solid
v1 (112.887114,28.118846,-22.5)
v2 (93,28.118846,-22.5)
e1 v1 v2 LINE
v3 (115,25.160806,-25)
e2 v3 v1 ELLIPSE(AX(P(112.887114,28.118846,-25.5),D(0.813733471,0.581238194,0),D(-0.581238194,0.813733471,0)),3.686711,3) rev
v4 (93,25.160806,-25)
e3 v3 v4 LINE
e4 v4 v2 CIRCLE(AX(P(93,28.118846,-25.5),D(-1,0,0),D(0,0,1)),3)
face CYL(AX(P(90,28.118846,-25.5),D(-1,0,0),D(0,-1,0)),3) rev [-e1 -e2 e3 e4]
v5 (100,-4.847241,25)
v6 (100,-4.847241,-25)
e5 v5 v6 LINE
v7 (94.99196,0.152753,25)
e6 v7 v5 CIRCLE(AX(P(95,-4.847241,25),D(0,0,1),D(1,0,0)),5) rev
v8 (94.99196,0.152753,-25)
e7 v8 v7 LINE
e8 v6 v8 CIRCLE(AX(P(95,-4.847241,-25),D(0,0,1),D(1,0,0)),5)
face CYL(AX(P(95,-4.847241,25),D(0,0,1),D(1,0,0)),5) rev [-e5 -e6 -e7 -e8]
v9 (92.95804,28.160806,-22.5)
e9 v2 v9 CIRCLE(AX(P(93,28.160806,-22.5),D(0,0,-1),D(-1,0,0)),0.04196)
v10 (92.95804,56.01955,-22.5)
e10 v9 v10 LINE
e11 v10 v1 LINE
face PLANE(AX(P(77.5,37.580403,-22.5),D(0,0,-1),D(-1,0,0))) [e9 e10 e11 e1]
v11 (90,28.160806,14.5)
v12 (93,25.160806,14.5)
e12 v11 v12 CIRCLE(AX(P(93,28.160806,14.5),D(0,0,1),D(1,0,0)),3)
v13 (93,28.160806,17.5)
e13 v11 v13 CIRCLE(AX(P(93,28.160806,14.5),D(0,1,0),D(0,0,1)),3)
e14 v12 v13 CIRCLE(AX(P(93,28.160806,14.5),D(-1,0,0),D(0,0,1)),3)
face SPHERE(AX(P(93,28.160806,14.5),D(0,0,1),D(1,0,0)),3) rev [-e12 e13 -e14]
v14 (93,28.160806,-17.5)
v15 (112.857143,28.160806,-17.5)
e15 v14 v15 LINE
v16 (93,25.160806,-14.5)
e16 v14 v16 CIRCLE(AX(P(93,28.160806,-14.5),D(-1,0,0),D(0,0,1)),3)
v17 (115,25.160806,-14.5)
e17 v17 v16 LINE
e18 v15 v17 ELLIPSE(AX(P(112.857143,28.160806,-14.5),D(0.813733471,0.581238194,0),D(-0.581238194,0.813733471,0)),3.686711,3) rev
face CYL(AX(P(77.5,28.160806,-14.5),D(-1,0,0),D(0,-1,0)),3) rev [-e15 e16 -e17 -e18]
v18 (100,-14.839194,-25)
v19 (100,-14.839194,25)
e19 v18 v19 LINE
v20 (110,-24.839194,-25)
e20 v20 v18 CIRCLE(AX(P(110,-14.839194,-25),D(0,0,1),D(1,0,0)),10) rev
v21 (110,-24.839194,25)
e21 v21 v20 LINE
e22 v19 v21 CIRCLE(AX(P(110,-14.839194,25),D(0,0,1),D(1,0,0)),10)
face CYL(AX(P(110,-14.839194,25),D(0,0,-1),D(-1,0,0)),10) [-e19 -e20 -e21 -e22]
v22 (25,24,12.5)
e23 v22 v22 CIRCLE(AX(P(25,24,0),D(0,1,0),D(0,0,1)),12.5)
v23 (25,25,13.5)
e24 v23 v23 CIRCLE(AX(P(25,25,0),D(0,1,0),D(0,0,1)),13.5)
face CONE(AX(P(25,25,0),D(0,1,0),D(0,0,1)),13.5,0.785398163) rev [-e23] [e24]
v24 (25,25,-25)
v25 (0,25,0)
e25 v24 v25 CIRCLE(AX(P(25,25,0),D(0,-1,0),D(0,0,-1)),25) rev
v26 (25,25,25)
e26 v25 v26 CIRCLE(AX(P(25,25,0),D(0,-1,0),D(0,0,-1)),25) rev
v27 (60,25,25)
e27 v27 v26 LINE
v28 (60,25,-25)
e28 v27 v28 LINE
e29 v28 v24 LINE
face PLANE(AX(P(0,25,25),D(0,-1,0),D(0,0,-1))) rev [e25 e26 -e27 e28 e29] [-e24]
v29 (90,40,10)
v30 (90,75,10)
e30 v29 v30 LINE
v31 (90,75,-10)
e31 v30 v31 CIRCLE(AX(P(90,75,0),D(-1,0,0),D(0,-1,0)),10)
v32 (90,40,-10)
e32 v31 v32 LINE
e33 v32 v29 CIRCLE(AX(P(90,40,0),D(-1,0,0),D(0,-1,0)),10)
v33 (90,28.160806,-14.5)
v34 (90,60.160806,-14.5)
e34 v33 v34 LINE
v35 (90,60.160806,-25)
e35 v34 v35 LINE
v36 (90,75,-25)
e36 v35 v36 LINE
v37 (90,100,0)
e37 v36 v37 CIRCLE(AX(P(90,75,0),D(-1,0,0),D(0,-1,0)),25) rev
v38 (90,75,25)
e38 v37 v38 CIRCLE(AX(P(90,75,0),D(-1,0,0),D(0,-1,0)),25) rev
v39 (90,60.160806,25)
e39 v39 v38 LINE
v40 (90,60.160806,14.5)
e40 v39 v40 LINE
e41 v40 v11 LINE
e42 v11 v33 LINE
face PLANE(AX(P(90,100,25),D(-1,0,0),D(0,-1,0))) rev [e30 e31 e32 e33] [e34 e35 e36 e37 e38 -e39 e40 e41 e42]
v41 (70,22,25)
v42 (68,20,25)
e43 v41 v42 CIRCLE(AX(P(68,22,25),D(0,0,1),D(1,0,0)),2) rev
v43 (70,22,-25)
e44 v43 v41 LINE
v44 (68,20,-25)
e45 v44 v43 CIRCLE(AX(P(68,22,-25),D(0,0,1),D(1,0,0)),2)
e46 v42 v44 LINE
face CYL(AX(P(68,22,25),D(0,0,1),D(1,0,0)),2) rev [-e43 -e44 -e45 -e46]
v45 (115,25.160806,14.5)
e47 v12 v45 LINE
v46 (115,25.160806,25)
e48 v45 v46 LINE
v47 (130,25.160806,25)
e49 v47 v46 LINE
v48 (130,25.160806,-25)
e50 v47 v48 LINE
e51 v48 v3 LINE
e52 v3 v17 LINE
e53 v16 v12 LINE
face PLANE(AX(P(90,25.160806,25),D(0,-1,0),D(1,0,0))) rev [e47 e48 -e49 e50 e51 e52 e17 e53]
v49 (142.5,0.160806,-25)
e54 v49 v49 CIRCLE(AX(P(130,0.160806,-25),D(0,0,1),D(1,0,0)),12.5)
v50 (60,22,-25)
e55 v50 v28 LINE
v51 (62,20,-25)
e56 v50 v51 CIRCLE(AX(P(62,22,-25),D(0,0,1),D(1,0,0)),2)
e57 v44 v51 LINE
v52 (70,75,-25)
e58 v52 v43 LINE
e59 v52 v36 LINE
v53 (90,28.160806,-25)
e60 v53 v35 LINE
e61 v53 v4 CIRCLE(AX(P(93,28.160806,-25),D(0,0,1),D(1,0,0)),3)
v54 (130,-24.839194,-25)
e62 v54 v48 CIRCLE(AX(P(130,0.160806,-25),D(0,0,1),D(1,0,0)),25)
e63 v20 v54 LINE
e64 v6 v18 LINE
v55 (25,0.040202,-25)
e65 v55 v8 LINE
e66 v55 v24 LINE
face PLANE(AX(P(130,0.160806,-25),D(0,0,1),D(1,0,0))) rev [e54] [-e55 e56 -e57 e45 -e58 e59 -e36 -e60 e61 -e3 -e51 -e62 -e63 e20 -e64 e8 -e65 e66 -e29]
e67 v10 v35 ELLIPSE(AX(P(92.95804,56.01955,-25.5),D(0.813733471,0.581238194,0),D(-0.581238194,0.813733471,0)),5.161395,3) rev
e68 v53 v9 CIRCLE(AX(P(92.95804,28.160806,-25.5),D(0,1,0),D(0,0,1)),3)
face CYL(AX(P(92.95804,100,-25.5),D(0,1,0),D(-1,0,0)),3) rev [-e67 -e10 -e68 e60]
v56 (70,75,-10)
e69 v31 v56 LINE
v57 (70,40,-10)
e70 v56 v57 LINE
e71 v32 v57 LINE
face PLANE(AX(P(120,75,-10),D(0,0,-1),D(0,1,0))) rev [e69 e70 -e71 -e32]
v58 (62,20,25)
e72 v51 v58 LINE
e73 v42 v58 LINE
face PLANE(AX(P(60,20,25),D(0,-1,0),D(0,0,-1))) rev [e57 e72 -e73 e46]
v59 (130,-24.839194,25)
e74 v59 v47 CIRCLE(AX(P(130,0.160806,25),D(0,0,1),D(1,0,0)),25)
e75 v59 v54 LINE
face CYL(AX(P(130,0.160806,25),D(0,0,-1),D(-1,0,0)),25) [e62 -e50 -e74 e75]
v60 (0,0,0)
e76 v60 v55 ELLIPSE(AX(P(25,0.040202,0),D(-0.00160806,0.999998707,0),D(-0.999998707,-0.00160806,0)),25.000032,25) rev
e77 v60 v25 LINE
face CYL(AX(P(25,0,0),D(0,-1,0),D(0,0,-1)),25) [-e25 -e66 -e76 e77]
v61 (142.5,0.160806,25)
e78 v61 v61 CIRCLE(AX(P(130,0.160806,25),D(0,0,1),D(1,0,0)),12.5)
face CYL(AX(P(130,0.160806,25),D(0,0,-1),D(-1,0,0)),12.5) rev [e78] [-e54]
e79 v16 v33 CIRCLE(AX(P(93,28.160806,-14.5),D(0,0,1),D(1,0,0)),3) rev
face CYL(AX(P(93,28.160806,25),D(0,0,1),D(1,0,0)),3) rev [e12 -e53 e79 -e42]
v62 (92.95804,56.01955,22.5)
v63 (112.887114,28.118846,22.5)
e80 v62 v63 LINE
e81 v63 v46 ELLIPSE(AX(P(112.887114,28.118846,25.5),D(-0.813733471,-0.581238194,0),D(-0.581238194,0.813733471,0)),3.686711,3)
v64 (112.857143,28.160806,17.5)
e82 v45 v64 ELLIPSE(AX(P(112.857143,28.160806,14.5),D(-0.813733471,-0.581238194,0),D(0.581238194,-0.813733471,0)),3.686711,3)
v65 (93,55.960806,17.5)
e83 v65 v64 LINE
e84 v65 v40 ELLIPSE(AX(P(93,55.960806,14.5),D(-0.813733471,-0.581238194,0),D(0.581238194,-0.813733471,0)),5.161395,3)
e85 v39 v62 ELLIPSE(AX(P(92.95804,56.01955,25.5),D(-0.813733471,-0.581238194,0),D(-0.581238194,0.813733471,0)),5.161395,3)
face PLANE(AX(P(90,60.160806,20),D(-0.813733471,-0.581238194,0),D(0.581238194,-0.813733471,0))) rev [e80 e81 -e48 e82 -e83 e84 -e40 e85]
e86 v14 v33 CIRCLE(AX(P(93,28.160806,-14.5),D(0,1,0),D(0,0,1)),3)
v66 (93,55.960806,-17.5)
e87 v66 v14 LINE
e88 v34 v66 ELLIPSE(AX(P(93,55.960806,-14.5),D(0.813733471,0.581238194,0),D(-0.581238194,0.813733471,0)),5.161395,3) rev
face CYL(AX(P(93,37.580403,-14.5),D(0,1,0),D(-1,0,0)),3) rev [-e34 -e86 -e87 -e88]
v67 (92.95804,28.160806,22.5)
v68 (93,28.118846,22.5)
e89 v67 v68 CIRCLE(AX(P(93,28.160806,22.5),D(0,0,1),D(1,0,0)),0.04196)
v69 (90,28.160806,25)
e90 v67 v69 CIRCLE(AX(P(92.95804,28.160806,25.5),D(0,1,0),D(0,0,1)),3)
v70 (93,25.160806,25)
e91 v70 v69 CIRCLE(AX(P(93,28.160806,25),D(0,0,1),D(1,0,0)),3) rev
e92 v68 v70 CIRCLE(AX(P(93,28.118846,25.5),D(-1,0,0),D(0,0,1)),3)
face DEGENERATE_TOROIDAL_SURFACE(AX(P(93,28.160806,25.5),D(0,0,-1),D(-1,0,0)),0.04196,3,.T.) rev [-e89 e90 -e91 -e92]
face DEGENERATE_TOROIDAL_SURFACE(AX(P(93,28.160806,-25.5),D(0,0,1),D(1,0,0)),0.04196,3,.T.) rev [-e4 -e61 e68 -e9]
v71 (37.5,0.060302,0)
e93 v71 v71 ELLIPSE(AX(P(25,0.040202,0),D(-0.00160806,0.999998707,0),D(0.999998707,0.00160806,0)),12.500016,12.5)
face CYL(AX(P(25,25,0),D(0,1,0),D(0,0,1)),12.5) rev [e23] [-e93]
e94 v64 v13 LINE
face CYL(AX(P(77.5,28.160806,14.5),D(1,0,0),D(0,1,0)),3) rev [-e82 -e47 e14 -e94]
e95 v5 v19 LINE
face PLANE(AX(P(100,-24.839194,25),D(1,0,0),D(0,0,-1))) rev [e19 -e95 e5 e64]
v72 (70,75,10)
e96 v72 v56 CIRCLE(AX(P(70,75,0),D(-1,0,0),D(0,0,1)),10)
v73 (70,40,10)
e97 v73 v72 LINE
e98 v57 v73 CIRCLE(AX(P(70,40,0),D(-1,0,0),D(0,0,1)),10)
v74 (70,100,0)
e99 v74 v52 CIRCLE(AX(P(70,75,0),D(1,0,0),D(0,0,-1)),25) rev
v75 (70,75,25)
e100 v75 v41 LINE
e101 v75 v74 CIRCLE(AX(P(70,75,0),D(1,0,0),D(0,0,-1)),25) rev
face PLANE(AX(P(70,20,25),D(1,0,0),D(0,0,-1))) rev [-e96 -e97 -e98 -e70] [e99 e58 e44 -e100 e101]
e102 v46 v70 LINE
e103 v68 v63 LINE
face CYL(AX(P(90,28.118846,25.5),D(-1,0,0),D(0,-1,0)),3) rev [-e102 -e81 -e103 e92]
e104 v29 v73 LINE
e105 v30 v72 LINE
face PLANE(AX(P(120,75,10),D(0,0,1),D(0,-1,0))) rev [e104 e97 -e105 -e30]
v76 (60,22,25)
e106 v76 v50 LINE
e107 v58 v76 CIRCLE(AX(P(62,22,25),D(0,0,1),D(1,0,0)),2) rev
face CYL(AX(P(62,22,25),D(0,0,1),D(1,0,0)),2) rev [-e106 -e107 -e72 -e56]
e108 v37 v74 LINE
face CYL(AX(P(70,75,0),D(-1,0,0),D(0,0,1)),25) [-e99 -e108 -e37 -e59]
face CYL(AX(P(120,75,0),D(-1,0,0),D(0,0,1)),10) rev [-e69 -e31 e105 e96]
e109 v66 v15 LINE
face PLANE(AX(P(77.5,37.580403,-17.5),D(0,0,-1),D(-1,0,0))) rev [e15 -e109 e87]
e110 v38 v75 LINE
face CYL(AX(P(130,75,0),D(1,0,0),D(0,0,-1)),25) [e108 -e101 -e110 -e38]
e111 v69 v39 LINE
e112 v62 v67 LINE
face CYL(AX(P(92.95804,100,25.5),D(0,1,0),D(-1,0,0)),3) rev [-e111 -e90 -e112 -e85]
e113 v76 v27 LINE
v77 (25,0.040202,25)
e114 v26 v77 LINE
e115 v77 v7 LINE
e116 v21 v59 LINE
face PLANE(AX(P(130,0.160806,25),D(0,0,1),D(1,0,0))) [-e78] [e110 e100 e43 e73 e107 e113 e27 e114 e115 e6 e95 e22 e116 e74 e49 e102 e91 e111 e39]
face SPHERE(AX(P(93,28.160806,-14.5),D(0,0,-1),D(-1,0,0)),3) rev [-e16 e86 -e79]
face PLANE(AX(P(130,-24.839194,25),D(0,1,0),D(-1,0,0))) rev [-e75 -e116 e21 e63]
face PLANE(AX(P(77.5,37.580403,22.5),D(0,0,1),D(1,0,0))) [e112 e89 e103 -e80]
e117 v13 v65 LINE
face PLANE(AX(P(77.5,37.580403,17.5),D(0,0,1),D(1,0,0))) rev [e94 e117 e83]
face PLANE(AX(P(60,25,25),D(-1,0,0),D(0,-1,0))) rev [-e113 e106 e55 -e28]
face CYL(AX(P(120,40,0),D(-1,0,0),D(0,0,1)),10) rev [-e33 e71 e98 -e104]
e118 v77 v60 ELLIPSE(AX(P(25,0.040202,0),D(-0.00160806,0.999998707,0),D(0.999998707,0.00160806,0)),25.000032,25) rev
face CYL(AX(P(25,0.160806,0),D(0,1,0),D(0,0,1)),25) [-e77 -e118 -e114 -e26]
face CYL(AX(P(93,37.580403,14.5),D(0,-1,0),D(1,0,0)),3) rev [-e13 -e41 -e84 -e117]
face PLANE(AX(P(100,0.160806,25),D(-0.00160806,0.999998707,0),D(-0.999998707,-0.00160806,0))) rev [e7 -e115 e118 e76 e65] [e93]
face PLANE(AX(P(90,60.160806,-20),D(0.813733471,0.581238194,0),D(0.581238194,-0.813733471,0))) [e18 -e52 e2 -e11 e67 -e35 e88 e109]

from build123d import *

# Parameters (mm, degrees)
ESBO_O1_R                              = 12.5
RESSALTO_EXTRUS_O1_DEPTH               = 25
FILETE1_R                              = 10
FILETE2_R                              = 5
FILETE3_R                              = 3
FILETE4_R                              = 2
FILETE5_R                              = 25
FURO_DE_DI_METRO_25_0_25_1_D           = 25
FURO_DE_DI_METRO_25_0_25_1_CSINK_D     = 27
FURO_DE_DI_METRO_25_0_25_1_CSINK_ANGLE = 90
CORTE_EXTRUS_O1_DEPTH                  = 50
NERVURA1_REACH                         = 191.868
ESBO_O6_WALL_W                         = 424.748377256
ESBO_O6_WALL_H                         = 5
FILETE6_R                              = 3


with BuildPart() as part:
    # Esboço1 → Ressalto-extrusão1 (new, symmetric)
    with BuildSketch(Plane.XY):
        with BuildLine():
            Line((0, 0), (0, 25))
            Line((0, 25), (60, 25))
            Line((60, 25), (60, 20))
            Line((60, 20), (70, 20))
            Line((70, 20), (70, 100))
            Line((70, 100), (90, 100))
            Line((90, 100), (90, 25.160806235))
            Line((90, 25.160806235), (130, 25.160806235))
            ThreePointArc((130, 25.160806235), (155, 0.160806235), (130, -24.839193765))
            Line((130, -24.839193765), (100, -24.839193765))
            Line((100, -24.839193765), (100, 0.160806235))
            Line((100, 0.160806235), (0, 0))
        make_face()
        with Locations((130, 0.160806235)):
            Circle(ESBO_O1_R, mode=Mode.SUBTRACT)
    extrude(amount=RESSALTO_EXTRUS_O1_DEPTH, both=True)

    # Filete1
    filete1_edges = [part.edges().sort_by_distance(p)[0] for p in [
        (100, -24.839193765, 0),
    ]]
    fillet(filete1_edges, radius=FILETE1_R)

    # Filete2
    filete2_edges = [part.edges().sort_by_distance(p)[0] for p in [
        (100, 0.160806235, 0),
    ]]
    fillet(filete2_edges, radius=FILETE2_R)

    # Filete3
    filete3_edges = [part.edges().sort_by_distance(p)[0] for p in [
        (90, 25.160806235, 0),
    ]]
    fillet(filete3_edges, radius=FILETE3_R)

    # Filete4
    filete4_edges = [part.edges().sort_by_distance(p)[0] for p in [
        (60, 20, 0),
        (70, 20, 0),
    ]]
    fillet(filete4_edges, radius=FILETE4_R)

    # Filete5
    filete5_edges = [part.edges().sort_by_distance(p)[0] for p in [
        (0, 12.5, -25),
        (0, 12.5, 25),
        (80, 100, 25),
        (80, 100, -25),
    ]]
    fillet(filete5_edges, radius=FILETE5_R - 0.0001)  # a hair under: the kernel refuses the full size

    # Furo de diâmetro Ø25.0 (25)1 (through all)
    with Locations(Plane(origin=(0, 25, 0), x_dir=(1, 0, 0), z_dir=(0, 1, 0))):
        with Locations((25, 0)):
            CounterSinkHole(FURO_DE_DI_METRO_25_0_25_1_D / 2, FURO_DE_DI_METRO_25_0_25_1_CSINK_D / 2, counter_sink_angle=FURO_DE_DI_METRO_25_0_25_1_CSINK_ANGLE)

    # Esboço5 → Corte-extrusão1 (cut)
    with BuildSketch(Plane.ZY.offset(-70)):
        with BuildLine():
            Line((10, 75), (10, 40))
            ThreePointArc((10, 40), (0, 30), (-10, 40))
            Line((-10, 40), (-10, 75))
            ThreePointArc((-10, 75), (0, 85), (10, 75))
        make_face()
    extrude(amount=-CORTE_EXTRUS_O1_DEPTH, mode=Mode.SUBTRACT)

    # Esboço6 wall → Nervura1 (add, up to next)
    with BuildSketch(Plane(origin=(102.5, 42.660806235, 20), x_dir=(0.581238193719, -0.813733471207, 0), z_dir=(0.813733471207, 0.581238193719, 0)), mode=Mode.PRIVATE) as nervura1_sk1:
        Rectangle(ESBO_O6_WALL_W, ESBO_O6_WALL_H)
    nervura1_tool1 = extrude(nervura1_sk1.sketch, amount=-NERVURA1_REACH, mode=Mode.PRIVATE) - part.part
    add(nervura1_tool1.solids().sort_by_distance((102.5, 42.660806235, 20))[0])

    # Filete6
    # the kernel refuses this fillet: 3 mm, written as the material it adds along each edge
    with BuildSketch(Plane(origin=(122.5, 25.160806235, 17.5), x_dir=(0, 0, -1), z_dir=(-1, 0, 0))) as filete6_piece_1_section:
        with BuildLine():
            CenterArc((FILETE6_R, -FILETE6_R), FILETE6_R, 90, 90)
            Line((0, -FILETE6_R), (0, 0))
            Line((0, 0), (FILETE6_R, 0))
        make_face()
    filete6_piece_1 = extrude(amount=29.5, mode=Mode.PRIVATE)
    filete6_piece_1 = split(filete6_piece_1, bisect_by=Plane(origin=(117.533783784, 21.613508937, 17.5), z_dir=(-0.8137334712068701, -0.5812381937189072, 0)), keep=Keep.TOP, mode=Mode.PRIVATE)
    add(filete6_piece_1)
    with BuildSketch(Plane(origin=(93, 28.160806235, 17.5), x_dir=(0, -1, 0), z_dir=(1, 0, 0))) as filete6_piece_2:
        with BuildLine():
            CenterArc((3 - FILETE6_R, FILETE6_R), FILETE6_R, 270, 90)
            Line((3, FILETE6_R), (3, 0))
            Line((3, 0), (3 - FILETE6_R, 0))
        make_face()
    revolve(axis=Axis((93, 28.160806235, 17.5), (0, 0, -1)), revolution_arc=90)
    with BuildSketch(Plane(origin=(90, 28.160806235, 17.5), x_dir=(0, 0, -1), z_dir=(0, 1, 0))) as filete6_piece_3_section:
        with BuildLine():
            CenterArc((FILETE6_R, -FILETE6_R), FILETE6_R, 90, 90)
            Line((0, -FILETE6_R), (0, 0))
            Line((0, 0), (FILETE6_R, 0))
        make_face()
    filete6_piece_3 = extrude(amount=39.5, mode=Mode.PRIVATE)
    filete6_piece_3 = split(filete6_piece_3, bisect_by=Plane(origin=(105.135135135, 38.971617046, 17.5), z_dir=(-0.8137334712068701, -0.5812381937189072, 0)), keep=Keep.TOP, mode=Mode.PRIVATE)
    add(filete6_piece_3)
    with BuildSketch(Plane(origin=(93, 25.160806235, 22.5), x_dir=(0, 0, 1), z_dir=(1, 0, 0))) as filete6_piece_4_section:
        with BuildLine():
            CenterArc((3, -2.958039892), FILETE6_R, 99.594068227, 80.405931773)
            Line((0, -2.958039892), (0, 0))
            Line((0, 0), (2.5, 0))
        make_face()
    filete6_piece_4 = extrude(amount=29.395099729, mode=Mode.PRIVATE)
    filete6_piece_4 = split(filete6_piece_4, bisect_by=Plane(origin=(107.567567568, 35.56621164, 22.5), z_dir=(-0.8137334712068701, -0.5812381937189072, 0)), keep=Keep.TOP, mode=Mode.PRIVATE)
    add(filete6_piece_4)
    with BuildSketch(Plane(origin=(93, 28.160806235, 22.5), x_dir=(0, -1, 0), z_dir=(1, 0, 0))) as filete6_piece_5:
        with BuildLine():
            CenterArc((0.041960108, -3), FILETE6_R, 9.594068227, 80.405931773)
            Line((0.041960108, 0), (3, 0))
            Line((3, 0), (3, -2.5))
        make_face()
    revolve(axis=Axis((93, 28.160806235, 22.5), (0, 0, -1)), revolution_arc=90)
    with BuildSketch(Plane(origin=(90, 67.555905964, 22.5), x_dir=(0, 0, 1), z_dir=(0, -1, 0))) as filete6_piece_6_section:
        with BuildLine():
            CenterArc((3, -2.958039892), FILETE6_R, 99.594068227, 80.405931773)
            Line((0, -2.958039892), (0, 0))
            Line((0, 0), (2.5, 0))
        make_face()
    filete6_piece_6 = extrude(amount=39.395099729, mode=Mode.PRIVATE)
    filete6_piece_6 = split(filete6_piece_6, bisect_by=Plane(origin=(86.502317696, 65.057561461, 22.5), z_dir=(-0.8137334712068701, -0.5812381937189072, 0)), keep=Keep.TOP, mode=Mode.PRIVATE)
    add(filete6_piece_6)

    # Espelhar1: read off the stored shape, not the designer's step
    # Espelhar1: part across plane


with BuildPart() as part_1:
    add(part.part)
    add(part.part.mirror(Plane.XY))


solid = part_1.part
